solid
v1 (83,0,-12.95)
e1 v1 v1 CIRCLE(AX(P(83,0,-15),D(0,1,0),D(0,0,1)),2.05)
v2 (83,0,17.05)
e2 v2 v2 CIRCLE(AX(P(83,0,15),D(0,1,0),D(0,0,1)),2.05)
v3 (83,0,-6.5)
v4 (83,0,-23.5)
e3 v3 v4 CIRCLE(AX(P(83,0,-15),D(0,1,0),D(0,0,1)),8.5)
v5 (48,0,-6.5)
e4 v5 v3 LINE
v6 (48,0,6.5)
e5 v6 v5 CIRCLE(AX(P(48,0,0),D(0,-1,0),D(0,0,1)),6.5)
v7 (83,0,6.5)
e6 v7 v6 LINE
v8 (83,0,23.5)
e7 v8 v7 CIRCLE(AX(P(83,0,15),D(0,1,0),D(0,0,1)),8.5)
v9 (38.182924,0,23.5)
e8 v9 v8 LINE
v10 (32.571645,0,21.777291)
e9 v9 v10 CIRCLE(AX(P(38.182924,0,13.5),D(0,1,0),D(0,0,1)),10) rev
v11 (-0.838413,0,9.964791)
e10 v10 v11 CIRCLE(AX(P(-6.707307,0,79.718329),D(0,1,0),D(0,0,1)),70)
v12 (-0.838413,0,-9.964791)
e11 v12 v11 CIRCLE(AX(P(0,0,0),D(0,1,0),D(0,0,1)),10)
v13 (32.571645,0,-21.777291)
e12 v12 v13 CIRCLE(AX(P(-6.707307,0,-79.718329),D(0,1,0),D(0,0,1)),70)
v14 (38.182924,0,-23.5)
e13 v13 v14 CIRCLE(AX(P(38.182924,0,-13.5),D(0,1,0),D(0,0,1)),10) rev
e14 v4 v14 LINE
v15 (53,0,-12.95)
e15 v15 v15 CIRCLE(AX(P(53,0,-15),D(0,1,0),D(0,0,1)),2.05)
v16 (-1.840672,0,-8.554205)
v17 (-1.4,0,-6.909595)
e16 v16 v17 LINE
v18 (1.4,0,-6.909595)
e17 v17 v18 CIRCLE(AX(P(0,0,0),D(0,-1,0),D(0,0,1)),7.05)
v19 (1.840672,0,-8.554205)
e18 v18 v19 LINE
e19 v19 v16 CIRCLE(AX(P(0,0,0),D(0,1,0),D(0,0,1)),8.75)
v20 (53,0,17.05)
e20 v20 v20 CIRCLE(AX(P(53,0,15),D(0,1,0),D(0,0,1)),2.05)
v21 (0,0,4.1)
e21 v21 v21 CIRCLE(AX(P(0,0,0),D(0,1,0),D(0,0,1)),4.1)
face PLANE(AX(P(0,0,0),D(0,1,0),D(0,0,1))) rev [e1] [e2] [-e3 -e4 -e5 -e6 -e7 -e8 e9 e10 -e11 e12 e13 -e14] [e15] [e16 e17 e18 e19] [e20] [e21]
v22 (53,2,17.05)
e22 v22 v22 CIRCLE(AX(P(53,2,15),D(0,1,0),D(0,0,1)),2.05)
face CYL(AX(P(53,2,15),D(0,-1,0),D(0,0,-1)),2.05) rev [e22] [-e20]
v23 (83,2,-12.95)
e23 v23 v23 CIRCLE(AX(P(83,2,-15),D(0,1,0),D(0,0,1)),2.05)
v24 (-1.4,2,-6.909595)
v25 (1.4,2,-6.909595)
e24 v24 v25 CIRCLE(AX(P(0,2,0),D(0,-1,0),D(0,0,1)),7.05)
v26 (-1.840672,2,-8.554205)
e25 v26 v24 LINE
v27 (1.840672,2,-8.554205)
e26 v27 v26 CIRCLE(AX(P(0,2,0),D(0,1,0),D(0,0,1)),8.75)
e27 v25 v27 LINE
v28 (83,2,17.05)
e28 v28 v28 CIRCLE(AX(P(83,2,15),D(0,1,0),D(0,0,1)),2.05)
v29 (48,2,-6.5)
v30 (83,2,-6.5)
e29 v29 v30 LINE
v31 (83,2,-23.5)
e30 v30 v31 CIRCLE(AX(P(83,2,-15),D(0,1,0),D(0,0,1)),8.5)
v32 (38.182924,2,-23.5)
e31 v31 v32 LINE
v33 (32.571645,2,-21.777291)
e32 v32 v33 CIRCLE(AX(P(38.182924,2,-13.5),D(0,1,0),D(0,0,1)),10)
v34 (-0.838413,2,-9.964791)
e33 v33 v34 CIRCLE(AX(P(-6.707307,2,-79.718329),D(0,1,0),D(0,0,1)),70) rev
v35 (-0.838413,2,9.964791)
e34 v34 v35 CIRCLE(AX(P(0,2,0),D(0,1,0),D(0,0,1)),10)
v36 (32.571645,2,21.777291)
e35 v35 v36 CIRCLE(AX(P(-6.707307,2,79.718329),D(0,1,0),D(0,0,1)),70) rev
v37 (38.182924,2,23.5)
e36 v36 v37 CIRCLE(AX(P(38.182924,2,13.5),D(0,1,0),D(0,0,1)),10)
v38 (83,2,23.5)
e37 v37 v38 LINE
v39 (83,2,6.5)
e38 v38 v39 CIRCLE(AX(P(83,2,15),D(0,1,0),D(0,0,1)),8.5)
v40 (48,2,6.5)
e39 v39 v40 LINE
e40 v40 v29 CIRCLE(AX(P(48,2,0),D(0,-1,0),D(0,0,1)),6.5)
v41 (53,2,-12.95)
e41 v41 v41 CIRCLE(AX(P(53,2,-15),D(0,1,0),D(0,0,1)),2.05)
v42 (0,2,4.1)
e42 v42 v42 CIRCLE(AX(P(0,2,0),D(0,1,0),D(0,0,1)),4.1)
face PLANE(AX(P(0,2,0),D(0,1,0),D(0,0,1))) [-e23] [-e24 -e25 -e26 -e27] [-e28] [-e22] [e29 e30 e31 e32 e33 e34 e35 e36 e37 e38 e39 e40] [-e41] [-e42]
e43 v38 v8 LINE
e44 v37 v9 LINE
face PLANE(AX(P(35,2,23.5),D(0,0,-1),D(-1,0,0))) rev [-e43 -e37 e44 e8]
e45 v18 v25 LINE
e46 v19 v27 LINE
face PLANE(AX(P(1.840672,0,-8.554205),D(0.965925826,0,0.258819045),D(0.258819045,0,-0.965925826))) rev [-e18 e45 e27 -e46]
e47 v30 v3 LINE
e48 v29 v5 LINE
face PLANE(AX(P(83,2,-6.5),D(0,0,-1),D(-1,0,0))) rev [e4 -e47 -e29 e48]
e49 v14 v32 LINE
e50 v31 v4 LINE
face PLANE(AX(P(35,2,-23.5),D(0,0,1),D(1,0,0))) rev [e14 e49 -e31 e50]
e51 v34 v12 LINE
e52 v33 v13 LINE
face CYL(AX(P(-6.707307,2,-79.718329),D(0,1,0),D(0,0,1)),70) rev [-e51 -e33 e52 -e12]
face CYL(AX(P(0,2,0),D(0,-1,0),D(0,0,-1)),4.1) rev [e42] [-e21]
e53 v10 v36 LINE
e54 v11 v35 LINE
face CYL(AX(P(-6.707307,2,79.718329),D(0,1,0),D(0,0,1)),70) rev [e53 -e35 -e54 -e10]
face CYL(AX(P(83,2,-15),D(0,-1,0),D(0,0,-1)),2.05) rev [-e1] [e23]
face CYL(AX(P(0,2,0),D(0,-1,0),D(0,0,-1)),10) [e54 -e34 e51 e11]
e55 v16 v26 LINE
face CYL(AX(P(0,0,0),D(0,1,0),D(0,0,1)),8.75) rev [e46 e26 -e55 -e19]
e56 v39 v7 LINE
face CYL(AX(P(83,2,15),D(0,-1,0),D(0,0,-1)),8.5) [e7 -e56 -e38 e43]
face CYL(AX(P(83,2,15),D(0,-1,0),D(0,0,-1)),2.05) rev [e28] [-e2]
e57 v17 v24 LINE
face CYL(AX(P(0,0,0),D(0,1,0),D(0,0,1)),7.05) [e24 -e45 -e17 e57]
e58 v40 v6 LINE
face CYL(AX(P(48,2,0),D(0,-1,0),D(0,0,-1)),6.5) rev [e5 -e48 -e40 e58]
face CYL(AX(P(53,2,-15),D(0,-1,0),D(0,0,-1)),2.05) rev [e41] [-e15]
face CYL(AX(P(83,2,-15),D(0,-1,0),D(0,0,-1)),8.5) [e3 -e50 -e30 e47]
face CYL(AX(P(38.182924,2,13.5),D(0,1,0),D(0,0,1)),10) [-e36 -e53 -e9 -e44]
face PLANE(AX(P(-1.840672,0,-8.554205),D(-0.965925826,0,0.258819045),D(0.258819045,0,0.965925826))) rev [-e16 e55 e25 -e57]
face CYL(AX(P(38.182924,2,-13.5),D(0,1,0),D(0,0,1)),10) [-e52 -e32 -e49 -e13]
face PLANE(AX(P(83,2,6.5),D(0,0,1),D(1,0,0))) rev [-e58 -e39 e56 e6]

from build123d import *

# Parameters (mm, degrees)
SKETCH1_R           = 4.1
SKETCH1_R_2         = 2.05
BOSS_EXTRUDE1_DEPTH = 2
CUT_EXTRUDE1_DEPTH  = 95.490740287
FILLET1_DEPTH       = 2
FILLET2_R           = 10


with BuildPart() as part:
    # Sketch1 → Boss-Extrude1 (new body)
    with BuildSketch(Plane(origin=(0, 0, 0), x_dir=(1, 0, 0), z_dir=(0, 1, 0))):
        with BuildLine():
            Line((35, -10), (35, -23.5))
            Line((35, -23.5), (83, -23.5))
            ThreePointArc((83, -23.5), (91.5, -15), (83, -6.5))
            Line((83, -6.5), (48, -6.5))
            ThreePointArc((48, -6.5), (41.5, 0), (48, 6.5))
            Line((48, 6.5), (83, 6.5))
            ThreePointArc((83, 6.5), (91.5, 15), (83, 23.5))
            Line((83, 23.5), (35, 23.5))
            Line((35, 23.5), (35, 10))
            Line((35, 10), (0, 10))
            ThreePointArc((0, 10), (-10, 0), (0, -10))
            Line((0, -10), (35, -10))
        make_face()
        with Locations(Location((0, 0, 0), (0, 0, 270))):
            Circle(SKETCH1_R, mode=Mode.SUBTRACT)
        with Locations(Location((53, 15, 0), (0, 0, 270))):
            Circle(SKETCH1_R_2, mode=Mode.SUBTRACT)
        with Locations(Location((83, 15, 0), (0, 0, 270))):
            Circle(SKETCH1_R_2, mode=Mode.SUBTRACT)
        with Locations(Location((53, -15, 0), (0, 0, 270))):
            Circle(SKETCH1_R_2, mode=Mode.SUBTRACT)
        with Locations(Location((83, -15, 0), (0, 0, 270))):
            Circle(SKETCH1_R_2, mode=Mode.SUBTRACT)
    extrude(amount=BOSS_EXTRUDE1_DEPTH)

    # Sketch2 → Cut-Extrude1 (cut, through all)
    with BuildSketch(Plane(origin=(0, 2, 0), x_dir=(1, 0, 0), z_dir=(0, 1, 0))):
        with BuildLine():
            Line((-1.840672032, 8.554205192), (-1.4, 6.909594778))
            ThreePointArc((-1.4, 6.909594778), (0, 7.05), (1.4, 6.909594778))
            Line((1.4, 6.909594778), (1.840672032, 8.554205192))
            ThreePointArc((1.840672032, 8.554205192), (0, 8.75), (-1.840672032, 8.554205192))
        make_face()
    extrude(amount=-CUT_EXTRUDE1_DEPTH, mode=Mode.SUBTRACT)

    # Fillet1: read off the stored shape, not the designer's step
    # Fillet1 outline → Fillet1 (add)
    with BuildSketch(Plane(origin=(0, 0, 0), x_dir=(1, 0, 0), z_dir=(0, 1, 0))):
        with BuildLine():
            ThreePointArc((0, -10), (-0.41957616, -9.991193915), (-0.838413356, -9.964791169))
            ThreePointArc((-0.838413356, -9.964791169), (18.024740767, -14.233019392), (35, -23.5))
            Line((35, -23.5), (35, -10))
            Line((35, -10), (0, -10))
        make_face()
        with BuildLine():
            ThreePointArc((35, 23.5), (18.024740767, 14.233019392), (-0.838413356, 9.964791169))
            ThreePointArc((-0.838413356, 9.964791169), (-0.41957616, 9.991193915), (0, 10))
            Line((0, 10), (35, 10))
            Line((35, 10), (35, 23.5))
        make_face()
    extrude(amount=FILLET1_DEPTH)

    # Fillet2
    fillet2_edges = [part.edges().sort_by_distance(p)[0] for p in [
        (35, 1, -23.5),
        (35, 1, 23.5),
    ]]
    fillet(fillet2_edges, radius=FILLET2_R)


solid = part.part
